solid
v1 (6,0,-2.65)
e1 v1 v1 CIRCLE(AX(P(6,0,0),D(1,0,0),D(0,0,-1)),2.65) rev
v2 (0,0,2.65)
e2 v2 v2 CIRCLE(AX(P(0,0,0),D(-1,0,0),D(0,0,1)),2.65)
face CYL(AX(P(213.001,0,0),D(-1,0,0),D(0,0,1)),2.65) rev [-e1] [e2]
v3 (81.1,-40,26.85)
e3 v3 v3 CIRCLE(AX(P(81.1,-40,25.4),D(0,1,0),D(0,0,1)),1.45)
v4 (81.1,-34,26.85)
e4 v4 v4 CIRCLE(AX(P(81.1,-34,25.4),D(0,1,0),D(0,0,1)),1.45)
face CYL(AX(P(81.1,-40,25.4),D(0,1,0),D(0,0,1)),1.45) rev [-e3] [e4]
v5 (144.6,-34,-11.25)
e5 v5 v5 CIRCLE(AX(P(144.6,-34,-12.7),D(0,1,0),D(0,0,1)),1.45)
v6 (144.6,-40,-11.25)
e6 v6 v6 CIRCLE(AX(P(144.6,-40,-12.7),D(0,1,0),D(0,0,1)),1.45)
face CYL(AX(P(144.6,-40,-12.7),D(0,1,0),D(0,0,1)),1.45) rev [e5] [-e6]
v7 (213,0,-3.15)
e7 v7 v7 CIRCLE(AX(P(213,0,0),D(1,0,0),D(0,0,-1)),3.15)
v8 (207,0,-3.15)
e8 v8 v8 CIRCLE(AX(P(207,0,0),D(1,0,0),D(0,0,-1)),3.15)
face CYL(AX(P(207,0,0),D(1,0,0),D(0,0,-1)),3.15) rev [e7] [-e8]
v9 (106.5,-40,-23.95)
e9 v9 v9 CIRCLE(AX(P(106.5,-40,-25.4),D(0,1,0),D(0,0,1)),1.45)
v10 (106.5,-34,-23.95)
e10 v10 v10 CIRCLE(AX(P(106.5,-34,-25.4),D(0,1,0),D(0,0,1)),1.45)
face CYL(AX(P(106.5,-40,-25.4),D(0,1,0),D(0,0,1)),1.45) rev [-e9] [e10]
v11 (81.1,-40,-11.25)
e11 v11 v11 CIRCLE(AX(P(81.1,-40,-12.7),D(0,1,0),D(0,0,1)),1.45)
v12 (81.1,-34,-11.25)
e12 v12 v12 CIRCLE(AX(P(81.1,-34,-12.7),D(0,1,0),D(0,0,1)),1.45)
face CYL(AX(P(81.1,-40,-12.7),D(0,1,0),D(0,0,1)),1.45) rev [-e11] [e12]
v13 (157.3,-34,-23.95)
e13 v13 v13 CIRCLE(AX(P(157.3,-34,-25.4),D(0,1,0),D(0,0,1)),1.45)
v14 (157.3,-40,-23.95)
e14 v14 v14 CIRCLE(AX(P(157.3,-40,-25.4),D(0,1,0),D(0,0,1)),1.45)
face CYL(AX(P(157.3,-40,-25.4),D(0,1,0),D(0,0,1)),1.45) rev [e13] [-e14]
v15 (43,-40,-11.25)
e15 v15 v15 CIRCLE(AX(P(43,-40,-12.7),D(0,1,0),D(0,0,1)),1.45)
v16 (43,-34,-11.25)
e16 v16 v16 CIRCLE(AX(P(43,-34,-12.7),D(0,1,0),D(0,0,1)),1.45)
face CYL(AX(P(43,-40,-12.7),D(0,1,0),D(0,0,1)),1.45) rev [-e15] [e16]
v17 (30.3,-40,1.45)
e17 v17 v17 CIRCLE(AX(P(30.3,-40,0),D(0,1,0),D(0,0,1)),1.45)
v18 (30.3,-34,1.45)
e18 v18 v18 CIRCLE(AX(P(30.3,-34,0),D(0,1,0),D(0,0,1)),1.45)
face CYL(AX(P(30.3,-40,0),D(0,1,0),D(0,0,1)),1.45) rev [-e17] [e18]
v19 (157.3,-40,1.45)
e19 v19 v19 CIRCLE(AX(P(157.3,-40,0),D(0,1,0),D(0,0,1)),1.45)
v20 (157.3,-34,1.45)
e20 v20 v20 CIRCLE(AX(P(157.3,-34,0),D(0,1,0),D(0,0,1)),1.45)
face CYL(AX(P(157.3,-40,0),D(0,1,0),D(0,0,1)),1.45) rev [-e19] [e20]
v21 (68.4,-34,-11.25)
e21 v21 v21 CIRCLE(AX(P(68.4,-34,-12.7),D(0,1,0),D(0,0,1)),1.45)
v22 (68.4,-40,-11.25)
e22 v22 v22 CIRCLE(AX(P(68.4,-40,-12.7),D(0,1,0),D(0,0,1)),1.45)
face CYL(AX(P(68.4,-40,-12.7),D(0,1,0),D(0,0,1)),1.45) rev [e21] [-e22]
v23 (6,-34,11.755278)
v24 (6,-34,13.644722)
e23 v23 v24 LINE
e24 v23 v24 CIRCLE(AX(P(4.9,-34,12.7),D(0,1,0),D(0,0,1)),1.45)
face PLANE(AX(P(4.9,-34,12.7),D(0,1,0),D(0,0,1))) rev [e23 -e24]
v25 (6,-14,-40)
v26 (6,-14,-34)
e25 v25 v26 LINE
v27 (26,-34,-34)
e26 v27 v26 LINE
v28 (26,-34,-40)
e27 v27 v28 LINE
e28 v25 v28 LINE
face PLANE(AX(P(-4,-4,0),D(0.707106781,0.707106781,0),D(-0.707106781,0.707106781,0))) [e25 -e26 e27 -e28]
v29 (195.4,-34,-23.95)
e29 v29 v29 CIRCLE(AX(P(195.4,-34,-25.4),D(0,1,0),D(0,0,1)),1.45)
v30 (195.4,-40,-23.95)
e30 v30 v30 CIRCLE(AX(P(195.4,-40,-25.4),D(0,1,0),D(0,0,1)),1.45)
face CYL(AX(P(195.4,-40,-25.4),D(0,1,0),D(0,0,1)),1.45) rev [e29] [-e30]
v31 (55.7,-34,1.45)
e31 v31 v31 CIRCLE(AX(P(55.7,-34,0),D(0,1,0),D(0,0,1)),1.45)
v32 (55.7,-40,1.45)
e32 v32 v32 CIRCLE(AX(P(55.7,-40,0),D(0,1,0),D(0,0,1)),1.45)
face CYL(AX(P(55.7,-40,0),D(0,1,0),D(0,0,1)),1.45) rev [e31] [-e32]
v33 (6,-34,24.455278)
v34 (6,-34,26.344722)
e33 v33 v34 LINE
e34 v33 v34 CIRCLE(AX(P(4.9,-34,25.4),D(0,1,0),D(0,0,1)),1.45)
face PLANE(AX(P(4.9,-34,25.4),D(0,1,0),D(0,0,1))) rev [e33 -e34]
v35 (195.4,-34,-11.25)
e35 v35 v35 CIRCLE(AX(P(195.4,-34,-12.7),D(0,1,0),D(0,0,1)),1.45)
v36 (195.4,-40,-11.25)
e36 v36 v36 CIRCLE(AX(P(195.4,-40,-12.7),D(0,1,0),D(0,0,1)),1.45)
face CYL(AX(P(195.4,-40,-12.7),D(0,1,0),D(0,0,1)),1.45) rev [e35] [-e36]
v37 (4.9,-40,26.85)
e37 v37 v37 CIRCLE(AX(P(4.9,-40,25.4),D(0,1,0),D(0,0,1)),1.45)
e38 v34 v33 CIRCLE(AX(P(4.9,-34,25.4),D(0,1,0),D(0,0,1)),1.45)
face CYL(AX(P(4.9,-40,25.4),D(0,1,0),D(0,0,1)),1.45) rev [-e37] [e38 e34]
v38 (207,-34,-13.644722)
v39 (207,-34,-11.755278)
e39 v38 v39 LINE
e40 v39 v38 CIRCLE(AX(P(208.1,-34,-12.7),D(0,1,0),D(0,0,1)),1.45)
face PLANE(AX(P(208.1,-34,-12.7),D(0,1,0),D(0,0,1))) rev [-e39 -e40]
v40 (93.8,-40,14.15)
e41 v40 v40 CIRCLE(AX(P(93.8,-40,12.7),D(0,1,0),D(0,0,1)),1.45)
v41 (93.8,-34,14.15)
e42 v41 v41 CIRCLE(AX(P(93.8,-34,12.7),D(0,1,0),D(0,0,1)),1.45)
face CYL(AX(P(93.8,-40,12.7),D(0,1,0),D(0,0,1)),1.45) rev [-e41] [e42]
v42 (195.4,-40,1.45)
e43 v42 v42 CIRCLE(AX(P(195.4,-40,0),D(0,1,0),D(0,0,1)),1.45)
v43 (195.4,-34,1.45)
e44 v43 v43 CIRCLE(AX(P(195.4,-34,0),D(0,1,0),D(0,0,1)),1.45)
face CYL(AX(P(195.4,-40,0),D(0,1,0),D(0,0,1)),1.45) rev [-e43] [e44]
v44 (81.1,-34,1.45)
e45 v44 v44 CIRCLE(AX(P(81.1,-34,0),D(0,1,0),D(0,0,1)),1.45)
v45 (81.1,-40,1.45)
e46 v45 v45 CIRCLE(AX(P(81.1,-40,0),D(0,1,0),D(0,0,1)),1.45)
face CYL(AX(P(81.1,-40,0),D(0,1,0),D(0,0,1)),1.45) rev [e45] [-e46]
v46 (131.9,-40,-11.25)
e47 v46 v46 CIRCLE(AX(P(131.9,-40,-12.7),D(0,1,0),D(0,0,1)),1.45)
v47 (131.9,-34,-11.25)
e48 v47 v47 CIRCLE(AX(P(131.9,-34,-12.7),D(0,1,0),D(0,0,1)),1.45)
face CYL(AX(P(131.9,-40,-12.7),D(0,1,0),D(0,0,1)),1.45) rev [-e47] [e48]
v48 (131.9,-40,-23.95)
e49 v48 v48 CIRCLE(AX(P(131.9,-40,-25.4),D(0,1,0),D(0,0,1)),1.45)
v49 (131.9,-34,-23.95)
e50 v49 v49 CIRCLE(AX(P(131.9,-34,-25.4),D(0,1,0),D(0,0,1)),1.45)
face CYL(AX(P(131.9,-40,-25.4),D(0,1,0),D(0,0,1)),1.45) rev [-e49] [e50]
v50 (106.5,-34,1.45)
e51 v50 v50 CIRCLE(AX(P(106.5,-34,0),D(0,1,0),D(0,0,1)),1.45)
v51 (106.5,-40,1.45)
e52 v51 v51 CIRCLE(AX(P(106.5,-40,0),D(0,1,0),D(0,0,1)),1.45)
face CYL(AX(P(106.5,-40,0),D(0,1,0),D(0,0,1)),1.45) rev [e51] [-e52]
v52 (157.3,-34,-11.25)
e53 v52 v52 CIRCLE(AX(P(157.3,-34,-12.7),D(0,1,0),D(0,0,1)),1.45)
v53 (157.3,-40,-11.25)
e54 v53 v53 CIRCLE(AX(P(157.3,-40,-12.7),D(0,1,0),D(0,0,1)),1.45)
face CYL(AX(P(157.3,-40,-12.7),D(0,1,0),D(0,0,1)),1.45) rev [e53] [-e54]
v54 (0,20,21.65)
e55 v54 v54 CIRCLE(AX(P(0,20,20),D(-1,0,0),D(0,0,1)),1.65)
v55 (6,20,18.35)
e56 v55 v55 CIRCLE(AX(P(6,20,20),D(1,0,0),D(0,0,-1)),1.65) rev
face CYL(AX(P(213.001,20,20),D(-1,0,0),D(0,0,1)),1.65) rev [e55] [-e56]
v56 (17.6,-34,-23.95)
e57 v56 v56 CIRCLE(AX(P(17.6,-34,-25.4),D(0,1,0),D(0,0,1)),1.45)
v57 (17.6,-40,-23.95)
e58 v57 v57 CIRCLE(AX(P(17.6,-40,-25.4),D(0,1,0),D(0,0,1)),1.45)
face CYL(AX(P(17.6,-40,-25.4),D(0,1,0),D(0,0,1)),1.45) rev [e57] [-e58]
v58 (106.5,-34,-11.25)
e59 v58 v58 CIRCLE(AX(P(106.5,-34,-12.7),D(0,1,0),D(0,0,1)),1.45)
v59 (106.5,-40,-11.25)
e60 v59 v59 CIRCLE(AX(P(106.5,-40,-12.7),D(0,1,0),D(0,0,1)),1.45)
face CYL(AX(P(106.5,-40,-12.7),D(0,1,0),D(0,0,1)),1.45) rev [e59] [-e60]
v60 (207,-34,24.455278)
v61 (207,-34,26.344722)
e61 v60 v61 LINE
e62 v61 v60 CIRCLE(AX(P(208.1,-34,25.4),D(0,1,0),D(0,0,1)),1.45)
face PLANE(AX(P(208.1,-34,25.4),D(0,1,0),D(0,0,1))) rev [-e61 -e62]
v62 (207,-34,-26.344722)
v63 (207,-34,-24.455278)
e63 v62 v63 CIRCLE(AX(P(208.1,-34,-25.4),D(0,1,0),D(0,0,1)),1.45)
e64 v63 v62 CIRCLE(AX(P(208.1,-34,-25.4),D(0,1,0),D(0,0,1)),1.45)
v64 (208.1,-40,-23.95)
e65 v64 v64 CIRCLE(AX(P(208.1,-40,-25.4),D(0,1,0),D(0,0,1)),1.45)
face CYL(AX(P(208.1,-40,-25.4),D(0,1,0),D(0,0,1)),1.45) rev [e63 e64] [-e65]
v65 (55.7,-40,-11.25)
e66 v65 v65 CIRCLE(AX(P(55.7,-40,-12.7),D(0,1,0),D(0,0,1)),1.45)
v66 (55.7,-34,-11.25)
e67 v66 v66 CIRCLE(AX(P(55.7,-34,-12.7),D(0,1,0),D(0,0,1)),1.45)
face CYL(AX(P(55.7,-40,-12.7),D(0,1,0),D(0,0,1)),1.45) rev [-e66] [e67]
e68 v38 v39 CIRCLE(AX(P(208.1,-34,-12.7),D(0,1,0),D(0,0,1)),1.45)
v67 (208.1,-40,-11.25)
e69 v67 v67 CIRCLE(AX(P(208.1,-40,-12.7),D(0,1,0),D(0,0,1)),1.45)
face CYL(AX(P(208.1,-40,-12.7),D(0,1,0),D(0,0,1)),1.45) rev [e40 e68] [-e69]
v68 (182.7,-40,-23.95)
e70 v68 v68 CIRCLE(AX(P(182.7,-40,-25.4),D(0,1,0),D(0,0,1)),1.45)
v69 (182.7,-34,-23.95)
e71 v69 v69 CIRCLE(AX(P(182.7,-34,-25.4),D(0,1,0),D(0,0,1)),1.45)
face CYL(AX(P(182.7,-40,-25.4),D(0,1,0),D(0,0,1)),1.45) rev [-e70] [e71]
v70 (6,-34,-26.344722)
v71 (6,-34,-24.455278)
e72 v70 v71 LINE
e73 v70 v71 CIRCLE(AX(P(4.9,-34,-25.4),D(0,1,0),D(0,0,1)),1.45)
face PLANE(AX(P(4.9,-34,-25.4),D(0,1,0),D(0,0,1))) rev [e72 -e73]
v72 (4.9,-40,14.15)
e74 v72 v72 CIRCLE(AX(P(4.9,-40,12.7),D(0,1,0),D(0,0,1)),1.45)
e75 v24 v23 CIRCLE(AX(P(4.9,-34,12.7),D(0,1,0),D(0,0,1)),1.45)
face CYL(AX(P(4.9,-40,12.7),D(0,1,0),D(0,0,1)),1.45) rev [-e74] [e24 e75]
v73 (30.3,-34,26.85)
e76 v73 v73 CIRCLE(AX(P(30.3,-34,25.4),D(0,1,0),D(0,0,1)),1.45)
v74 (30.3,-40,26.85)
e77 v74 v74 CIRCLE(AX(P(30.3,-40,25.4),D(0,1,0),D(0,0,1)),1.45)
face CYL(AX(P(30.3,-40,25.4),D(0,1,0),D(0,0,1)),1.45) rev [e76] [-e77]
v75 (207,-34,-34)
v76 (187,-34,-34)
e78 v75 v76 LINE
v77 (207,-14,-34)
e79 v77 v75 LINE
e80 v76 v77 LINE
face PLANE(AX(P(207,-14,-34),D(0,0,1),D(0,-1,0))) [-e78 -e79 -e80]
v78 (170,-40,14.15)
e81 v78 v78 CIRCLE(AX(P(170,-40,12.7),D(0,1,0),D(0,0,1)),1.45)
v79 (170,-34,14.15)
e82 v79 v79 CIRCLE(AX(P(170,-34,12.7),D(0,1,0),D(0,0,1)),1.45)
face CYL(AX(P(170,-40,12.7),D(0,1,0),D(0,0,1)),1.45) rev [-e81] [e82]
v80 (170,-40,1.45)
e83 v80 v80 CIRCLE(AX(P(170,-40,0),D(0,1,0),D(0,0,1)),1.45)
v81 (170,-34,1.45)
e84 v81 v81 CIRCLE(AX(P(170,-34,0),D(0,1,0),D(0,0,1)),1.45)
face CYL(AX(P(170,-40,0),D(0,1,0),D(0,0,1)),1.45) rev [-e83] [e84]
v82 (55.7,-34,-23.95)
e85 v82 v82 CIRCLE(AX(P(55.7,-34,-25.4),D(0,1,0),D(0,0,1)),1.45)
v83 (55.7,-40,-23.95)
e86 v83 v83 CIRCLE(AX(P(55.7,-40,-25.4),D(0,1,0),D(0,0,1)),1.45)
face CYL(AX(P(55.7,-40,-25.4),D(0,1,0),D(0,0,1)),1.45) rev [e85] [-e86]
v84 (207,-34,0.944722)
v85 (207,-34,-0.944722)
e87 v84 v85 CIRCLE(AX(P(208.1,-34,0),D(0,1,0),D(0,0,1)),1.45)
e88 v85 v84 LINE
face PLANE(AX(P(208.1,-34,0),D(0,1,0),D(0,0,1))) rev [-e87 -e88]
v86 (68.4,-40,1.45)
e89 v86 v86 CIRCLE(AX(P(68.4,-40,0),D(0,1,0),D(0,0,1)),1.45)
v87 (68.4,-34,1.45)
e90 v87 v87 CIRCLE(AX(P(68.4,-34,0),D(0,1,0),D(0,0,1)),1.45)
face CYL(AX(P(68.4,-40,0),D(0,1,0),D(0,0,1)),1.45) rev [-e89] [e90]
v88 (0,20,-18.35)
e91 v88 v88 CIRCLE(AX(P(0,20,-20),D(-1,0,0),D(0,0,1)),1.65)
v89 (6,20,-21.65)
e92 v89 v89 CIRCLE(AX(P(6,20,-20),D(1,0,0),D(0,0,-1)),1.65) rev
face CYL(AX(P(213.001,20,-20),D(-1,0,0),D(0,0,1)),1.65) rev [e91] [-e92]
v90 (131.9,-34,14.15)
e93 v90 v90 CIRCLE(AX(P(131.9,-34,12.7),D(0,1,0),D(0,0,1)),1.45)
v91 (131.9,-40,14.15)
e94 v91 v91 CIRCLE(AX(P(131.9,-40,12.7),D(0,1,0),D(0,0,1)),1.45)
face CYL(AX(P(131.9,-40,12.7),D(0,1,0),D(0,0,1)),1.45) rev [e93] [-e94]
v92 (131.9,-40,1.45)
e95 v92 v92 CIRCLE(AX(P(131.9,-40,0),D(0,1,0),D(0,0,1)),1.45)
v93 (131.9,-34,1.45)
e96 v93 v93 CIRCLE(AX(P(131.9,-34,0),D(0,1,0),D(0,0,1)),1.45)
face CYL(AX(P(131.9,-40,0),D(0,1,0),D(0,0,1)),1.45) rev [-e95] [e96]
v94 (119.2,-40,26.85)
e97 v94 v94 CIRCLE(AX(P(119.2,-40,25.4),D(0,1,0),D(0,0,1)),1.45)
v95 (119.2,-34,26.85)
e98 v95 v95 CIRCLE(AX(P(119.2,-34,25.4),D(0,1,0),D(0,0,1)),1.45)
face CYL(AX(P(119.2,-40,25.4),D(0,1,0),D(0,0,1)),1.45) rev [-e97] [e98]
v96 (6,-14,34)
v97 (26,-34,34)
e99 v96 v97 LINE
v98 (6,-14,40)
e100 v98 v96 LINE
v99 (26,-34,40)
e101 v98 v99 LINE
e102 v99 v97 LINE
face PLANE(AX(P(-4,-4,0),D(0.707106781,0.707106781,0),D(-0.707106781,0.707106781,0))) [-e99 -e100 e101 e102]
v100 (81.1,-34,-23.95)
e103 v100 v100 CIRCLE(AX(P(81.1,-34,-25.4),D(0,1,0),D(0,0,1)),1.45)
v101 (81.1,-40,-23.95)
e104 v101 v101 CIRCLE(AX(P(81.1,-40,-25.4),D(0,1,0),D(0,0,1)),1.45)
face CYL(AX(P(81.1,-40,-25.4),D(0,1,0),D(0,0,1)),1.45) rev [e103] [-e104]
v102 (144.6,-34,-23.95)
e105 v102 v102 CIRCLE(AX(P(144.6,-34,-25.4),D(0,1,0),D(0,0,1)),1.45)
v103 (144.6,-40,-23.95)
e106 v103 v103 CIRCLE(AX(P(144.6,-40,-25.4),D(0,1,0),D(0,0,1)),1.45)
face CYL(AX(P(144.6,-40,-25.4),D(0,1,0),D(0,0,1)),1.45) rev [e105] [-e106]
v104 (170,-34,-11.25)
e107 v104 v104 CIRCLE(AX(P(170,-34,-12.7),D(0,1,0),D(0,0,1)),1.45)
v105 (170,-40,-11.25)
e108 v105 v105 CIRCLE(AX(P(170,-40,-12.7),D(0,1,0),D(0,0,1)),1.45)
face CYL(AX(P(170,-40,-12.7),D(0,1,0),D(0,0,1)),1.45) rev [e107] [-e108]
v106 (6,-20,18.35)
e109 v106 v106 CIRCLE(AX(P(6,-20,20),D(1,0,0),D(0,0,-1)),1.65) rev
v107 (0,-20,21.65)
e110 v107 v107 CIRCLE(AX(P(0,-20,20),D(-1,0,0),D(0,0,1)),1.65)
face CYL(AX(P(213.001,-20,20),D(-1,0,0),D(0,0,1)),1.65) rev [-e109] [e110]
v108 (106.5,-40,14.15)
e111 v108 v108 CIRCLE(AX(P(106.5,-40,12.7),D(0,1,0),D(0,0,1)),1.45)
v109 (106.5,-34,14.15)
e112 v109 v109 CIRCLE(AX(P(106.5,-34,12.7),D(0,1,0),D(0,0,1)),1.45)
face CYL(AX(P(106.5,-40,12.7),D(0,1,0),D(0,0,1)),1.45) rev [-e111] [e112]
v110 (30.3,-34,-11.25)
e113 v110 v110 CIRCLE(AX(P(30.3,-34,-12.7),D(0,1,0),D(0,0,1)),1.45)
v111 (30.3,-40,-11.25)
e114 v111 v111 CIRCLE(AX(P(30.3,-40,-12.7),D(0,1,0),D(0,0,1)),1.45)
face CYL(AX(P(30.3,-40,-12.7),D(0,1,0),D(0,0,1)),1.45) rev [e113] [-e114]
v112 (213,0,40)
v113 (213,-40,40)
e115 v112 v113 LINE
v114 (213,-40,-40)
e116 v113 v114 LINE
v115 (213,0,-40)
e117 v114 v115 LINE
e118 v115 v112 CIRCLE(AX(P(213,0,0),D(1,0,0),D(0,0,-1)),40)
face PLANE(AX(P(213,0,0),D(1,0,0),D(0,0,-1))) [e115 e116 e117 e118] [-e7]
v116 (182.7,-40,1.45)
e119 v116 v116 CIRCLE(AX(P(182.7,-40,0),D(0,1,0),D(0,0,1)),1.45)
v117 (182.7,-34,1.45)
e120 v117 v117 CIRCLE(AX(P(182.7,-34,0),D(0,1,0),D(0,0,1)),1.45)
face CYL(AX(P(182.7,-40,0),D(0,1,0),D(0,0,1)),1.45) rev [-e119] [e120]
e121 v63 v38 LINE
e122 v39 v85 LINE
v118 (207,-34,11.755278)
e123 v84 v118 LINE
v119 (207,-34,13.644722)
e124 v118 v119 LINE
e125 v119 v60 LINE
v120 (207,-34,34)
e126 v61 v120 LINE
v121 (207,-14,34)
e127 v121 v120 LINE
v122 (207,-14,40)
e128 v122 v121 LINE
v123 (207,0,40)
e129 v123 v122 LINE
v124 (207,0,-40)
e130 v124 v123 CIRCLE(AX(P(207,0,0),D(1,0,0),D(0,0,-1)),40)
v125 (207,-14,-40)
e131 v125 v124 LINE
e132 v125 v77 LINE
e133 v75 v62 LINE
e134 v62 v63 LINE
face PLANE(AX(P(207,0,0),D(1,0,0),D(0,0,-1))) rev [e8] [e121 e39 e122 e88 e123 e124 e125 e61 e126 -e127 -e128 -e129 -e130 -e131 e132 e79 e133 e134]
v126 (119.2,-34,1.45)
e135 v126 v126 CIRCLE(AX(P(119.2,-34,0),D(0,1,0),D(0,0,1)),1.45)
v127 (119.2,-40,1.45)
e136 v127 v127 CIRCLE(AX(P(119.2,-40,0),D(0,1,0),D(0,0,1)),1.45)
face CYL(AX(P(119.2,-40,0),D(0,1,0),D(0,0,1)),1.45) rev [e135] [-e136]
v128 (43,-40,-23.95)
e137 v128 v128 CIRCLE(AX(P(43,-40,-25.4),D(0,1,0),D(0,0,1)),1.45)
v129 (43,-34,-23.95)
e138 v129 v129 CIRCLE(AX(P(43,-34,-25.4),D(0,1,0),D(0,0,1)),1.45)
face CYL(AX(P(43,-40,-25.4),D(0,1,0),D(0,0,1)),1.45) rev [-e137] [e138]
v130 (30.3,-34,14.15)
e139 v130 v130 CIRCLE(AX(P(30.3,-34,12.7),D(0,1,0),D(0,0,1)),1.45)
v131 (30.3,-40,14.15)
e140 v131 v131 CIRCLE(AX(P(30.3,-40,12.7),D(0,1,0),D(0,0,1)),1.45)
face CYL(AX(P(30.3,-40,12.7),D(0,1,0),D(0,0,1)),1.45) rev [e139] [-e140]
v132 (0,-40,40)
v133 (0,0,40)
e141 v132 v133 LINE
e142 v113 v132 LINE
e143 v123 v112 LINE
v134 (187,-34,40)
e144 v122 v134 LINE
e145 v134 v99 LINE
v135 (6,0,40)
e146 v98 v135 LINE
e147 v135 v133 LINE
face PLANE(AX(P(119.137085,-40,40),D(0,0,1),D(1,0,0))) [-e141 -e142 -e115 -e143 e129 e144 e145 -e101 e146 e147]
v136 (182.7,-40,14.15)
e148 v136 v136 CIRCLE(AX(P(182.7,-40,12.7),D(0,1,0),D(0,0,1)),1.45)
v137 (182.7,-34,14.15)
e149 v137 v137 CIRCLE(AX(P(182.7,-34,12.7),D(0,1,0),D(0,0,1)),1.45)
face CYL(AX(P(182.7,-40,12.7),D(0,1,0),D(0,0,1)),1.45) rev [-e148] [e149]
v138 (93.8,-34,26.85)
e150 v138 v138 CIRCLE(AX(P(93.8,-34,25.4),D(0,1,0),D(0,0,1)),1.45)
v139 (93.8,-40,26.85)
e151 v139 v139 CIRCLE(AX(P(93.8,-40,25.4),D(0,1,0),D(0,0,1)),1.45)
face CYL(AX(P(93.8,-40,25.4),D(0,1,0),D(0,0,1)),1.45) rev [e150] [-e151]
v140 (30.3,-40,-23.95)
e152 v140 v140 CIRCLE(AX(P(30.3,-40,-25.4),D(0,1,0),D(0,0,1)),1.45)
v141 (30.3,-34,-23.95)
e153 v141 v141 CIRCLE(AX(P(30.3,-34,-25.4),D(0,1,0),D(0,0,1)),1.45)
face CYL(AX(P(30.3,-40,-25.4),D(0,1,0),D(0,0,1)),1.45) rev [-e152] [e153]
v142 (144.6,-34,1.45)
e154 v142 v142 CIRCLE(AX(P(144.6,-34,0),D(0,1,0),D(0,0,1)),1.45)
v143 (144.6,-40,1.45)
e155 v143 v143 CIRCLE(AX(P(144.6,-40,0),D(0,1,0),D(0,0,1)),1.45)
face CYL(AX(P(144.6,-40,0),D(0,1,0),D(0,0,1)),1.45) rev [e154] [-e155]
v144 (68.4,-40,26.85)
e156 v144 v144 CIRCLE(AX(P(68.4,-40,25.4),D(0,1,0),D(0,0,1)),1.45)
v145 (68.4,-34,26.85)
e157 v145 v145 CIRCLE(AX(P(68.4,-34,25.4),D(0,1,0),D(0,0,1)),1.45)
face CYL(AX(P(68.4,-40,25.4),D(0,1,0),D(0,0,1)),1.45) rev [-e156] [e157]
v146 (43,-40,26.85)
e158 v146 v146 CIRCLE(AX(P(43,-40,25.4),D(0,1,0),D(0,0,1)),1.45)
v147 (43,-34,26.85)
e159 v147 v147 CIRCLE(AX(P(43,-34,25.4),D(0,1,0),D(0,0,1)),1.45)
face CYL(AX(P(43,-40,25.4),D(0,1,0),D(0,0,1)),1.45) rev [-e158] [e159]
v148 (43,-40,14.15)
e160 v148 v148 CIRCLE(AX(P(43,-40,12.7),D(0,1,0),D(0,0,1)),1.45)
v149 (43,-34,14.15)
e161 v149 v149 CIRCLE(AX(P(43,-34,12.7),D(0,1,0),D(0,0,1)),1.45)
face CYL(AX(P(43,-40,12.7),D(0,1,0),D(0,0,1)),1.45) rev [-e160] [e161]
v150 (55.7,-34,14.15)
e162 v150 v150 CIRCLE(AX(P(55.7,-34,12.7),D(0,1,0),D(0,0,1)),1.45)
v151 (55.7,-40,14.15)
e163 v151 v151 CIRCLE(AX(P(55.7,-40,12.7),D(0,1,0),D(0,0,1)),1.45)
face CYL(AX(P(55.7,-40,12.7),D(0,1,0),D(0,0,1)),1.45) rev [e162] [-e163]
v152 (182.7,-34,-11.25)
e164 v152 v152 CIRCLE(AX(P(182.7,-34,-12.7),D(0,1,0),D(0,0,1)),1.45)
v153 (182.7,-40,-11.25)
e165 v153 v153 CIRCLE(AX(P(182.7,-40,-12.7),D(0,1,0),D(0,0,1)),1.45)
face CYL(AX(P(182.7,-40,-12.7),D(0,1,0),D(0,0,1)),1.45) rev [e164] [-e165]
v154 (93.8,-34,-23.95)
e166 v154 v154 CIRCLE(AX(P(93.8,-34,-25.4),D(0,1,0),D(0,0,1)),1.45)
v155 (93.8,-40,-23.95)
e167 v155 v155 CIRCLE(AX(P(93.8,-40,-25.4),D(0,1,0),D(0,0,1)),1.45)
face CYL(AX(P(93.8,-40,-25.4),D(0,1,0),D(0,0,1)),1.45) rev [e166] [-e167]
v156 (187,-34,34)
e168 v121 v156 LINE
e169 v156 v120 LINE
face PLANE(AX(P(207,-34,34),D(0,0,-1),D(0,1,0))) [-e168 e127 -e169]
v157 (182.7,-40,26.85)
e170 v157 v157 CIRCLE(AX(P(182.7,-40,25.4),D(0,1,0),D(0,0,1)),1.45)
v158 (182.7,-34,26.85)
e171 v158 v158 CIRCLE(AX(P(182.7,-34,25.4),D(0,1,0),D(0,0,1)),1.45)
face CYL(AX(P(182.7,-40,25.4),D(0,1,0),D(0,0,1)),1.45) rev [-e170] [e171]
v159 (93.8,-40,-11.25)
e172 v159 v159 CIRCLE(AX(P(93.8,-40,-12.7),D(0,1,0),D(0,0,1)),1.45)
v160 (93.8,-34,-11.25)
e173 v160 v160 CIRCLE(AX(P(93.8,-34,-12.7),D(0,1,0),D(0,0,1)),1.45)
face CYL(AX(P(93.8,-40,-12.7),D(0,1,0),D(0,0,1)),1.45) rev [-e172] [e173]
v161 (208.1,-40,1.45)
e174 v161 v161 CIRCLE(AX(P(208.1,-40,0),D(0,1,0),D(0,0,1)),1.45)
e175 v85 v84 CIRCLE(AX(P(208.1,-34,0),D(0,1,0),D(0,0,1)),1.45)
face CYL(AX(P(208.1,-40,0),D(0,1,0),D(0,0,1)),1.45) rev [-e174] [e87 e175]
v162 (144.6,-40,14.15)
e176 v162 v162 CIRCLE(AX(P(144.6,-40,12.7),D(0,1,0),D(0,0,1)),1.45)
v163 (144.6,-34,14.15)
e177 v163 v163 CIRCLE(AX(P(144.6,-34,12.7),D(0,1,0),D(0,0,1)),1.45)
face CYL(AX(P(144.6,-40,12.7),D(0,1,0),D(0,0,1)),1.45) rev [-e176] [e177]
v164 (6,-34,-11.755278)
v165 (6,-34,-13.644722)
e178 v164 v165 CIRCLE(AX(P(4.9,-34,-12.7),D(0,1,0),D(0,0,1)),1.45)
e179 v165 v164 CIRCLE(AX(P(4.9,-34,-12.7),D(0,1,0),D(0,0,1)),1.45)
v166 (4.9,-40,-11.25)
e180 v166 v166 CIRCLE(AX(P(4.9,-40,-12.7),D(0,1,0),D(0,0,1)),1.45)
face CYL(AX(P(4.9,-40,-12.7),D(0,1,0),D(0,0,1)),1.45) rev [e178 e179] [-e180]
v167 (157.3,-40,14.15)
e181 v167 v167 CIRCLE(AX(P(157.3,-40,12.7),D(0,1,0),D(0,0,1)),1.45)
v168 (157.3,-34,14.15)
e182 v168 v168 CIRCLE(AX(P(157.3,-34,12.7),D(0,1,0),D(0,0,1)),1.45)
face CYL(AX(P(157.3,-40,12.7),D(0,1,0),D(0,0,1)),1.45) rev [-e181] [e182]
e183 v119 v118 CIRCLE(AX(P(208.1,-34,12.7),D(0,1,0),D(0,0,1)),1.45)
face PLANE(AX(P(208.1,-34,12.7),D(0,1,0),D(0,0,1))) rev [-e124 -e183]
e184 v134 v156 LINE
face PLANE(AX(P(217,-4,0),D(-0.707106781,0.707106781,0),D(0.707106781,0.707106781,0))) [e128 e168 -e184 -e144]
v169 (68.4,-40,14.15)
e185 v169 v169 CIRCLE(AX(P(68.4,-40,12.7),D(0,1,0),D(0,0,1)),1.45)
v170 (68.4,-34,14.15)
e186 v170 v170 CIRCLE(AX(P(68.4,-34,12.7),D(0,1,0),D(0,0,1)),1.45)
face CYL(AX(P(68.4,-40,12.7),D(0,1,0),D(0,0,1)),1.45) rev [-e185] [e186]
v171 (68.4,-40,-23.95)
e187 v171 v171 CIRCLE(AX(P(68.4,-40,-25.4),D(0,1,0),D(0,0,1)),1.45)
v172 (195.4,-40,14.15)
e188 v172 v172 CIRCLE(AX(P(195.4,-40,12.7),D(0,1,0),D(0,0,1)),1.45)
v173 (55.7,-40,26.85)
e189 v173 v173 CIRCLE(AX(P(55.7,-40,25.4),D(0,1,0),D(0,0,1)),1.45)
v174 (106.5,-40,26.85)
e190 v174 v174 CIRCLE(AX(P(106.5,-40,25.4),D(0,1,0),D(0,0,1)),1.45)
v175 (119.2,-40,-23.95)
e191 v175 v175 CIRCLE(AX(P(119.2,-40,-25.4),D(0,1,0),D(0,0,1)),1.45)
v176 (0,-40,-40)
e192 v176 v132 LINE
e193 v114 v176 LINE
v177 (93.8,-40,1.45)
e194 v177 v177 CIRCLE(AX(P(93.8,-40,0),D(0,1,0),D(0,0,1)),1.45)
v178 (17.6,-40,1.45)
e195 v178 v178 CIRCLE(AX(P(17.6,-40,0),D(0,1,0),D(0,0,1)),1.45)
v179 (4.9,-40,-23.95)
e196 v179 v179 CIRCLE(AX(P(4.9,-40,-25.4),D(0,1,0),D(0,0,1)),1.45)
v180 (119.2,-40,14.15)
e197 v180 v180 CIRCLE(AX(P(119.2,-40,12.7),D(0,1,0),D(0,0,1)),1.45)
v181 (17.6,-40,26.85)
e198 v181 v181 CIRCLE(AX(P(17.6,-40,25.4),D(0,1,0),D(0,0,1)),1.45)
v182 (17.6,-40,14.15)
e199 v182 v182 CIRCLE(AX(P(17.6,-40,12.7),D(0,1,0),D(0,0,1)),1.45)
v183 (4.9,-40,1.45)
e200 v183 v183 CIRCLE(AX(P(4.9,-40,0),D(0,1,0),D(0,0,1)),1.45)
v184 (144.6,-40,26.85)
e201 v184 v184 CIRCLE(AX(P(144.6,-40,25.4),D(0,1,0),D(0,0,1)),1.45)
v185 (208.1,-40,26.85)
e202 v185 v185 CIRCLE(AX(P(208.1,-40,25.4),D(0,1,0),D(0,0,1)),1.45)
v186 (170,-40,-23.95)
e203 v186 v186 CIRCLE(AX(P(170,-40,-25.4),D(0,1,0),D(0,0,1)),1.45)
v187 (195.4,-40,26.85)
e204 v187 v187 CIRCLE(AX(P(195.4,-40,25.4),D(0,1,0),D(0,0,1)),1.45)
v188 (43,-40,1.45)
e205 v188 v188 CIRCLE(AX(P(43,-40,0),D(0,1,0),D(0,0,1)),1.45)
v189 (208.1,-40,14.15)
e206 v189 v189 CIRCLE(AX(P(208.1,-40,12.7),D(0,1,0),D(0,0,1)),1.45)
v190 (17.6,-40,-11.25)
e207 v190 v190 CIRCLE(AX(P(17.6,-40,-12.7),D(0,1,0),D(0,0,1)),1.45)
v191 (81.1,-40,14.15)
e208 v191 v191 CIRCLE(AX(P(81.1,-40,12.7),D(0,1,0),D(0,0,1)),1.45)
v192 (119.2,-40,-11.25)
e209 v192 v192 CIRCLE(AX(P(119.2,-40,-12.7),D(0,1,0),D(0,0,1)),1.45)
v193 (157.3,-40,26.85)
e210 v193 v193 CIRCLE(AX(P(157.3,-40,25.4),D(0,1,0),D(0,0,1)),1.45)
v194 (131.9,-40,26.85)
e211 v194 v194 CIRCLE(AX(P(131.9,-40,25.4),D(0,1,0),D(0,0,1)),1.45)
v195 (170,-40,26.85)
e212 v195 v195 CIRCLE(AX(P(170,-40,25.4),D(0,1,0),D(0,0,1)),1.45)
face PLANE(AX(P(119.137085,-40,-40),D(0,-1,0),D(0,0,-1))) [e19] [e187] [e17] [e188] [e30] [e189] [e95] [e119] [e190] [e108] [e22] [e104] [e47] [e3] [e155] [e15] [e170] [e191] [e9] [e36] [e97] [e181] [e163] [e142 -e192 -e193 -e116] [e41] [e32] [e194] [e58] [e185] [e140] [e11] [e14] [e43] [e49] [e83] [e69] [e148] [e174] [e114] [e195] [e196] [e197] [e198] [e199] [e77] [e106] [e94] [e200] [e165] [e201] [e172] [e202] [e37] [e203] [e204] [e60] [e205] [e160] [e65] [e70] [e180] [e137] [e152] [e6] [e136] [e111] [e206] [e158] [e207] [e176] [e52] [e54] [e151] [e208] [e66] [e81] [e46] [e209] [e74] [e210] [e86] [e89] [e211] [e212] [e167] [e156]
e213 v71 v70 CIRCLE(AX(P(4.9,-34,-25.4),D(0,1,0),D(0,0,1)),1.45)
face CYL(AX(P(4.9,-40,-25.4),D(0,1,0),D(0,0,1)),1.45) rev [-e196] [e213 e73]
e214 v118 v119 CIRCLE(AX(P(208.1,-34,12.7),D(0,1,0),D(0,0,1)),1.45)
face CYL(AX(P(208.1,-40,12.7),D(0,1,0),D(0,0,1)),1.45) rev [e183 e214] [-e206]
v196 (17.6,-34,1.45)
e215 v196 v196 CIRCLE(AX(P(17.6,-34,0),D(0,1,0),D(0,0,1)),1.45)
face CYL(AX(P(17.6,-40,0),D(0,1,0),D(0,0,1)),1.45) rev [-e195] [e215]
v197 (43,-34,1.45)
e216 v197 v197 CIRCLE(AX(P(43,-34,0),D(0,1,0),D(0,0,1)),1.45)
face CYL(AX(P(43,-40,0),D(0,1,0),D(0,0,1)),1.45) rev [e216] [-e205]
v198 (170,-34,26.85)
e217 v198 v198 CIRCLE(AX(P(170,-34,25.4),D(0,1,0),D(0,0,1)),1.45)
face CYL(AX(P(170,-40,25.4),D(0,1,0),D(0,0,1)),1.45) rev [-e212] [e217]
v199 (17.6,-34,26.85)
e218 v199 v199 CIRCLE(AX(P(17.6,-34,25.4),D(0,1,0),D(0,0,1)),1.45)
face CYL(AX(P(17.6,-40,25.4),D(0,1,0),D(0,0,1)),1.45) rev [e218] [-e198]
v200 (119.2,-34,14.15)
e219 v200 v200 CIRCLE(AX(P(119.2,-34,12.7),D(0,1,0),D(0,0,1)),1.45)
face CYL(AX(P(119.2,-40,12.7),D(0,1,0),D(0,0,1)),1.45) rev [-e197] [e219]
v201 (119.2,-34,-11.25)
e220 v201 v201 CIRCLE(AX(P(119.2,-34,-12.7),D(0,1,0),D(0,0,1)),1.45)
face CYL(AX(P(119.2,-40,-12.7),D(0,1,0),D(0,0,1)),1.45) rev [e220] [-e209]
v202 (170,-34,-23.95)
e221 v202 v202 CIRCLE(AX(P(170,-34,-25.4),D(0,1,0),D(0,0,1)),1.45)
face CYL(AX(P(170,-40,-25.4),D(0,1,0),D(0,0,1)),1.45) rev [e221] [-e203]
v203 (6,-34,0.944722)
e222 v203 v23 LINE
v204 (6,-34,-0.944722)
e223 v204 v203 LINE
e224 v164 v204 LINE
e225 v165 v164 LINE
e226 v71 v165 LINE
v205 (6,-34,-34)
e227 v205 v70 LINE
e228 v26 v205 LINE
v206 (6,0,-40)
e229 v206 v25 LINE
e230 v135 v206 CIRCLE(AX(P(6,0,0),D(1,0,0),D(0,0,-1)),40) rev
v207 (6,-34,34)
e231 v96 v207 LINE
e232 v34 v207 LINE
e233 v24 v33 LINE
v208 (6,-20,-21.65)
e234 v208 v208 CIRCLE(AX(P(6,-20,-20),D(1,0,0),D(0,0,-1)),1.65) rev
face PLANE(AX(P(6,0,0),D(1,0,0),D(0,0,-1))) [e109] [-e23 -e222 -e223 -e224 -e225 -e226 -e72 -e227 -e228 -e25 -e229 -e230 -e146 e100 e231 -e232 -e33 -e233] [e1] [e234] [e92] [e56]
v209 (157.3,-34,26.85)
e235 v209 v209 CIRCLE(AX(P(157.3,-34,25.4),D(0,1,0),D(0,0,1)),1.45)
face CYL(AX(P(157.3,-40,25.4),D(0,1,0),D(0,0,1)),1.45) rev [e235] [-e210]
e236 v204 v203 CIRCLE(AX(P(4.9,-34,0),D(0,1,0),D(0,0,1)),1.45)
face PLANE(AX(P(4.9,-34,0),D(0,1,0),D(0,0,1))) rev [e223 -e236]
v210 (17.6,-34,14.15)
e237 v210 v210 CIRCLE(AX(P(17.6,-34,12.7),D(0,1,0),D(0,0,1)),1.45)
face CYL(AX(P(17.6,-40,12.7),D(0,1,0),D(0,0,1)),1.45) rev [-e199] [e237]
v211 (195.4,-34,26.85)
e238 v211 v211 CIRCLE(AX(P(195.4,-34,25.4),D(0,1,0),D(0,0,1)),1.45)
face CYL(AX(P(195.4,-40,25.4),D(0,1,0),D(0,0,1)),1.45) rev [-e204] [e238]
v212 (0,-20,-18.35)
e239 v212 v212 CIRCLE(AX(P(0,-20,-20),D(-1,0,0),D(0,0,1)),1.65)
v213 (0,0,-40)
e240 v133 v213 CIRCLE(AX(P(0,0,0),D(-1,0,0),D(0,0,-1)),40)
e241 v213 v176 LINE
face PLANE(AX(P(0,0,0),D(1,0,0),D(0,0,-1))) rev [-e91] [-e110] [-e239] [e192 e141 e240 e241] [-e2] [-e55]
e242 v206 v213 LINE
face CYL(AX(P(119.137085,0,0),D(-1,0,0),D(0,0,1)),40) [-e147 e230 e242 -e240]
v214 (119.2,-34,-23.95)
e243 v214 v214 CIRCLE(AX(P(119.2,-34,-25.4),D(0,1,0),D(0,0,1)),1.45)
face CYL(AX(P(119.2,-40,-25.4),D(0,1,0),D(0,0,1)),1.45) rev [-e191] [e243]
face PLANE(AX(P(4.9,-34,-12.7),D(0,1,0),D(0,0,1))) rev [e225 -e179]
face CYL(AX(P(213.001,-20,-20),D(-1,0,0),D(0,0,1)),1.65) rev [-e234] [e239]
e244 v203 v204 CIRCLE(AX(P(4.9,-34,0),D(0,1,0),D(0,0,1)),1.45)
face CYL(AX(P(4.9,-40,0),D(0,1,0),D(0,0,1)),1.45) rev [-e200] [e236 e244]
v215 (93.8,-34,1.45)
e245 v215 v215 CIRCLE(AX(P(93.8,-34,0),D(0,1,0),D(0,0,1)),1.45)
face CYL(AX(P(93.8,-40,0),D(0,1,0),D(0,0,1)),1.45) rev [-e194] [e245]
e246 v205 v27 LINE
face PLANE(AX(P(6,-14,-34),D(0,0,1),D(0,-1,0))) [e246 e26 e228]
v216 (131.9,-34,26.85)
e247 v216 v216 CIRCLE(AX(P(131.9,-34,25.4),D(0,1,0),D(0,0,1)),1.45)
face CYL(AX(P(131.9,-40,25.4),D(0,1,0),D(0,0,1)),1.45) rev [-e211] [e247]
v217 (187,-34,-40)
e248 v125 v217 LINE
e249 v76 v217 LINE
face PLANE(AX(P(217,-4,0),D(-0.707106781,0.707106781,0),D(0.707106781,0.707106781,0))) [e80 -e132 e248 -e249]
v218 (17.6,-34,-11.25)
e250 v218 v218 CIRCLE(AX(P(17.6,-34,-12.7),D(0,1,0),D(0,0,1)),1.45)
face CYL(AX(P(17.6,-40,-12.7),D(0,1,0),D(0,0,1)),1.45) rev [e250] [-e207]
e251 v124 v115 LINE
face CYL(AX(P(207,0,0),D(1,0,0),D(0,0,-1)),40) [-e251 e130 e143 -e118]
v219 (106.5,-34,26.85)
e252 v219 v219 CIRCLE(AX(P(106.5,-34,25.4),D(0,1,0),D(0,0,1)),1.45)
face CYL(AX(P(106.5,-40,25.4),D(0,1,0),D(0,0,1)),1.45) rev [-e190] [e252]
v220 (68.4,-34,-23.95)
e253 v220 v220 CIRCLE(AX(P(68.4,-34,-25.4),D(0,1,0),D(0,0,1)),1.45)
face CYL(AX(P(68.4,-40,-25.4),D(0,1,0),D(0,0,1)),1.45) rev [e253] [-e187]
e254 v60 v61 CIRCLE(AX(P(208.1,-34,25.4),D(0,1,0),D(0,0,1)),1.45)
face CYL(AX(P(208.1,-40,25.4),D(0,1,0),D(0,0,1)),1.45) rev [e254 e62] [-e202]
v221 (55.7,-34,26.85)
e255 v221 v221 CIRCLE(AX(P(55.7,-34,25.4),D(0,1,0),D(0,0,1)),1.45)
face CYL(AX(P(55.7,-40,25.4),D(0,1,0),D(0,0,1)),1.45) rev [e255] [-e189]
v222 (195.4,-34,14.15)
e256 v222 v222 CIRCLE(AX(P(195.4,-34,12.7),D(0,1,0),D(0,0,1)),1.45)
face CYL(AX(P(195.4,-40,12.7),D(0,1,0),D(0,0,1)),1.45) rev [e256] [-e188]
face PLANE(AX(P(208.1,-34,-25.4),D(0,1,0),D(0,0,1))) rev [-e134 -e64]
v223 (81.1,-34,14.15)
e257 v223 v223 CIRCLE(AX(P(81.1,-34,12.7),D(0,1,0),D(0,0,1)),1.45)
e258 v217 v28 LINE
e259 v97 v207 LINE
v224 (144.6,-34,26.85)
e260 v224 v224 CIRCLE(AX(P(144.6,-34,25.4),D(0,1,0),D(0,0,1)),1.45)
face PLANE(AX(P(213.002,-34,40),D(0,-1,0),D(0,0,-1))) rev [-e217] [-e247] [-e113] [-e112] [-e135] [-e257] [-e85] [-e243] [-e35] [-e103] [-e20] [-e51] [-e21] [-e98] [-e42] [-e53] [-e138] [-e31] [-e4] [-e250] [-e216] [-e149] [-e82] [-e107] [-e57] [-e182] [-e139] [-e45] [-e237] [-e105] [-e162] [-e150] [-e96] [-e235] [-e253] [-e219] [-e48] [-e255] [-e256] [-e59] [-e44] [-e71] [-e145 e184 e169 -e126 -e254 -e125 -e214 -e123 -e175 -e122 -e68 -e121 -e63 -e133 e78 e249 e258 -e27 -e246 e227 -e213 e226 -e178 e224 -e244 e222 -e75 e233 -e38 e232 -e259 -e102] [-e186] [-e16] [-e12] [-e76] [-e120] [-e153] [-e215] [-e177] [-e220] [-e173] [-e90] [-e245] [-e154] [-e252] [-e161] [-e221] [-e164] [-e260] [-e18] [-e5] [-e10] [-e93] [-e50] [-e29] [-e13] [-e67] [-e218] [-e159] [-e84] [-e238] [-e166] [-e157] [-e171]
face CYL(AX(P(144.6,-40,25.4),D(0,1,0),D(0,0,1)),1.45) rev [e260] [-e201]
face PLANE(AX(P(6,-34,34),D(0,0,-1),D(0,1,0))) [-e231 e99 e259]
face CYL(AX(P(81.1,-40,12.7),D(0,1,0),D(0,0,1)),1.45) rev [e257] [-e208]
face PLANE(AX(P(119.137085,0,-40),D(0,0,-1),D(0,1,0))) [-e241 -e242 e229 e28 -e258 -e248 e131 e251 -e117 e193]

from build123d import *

# Parameters (mm, degrees)
SKETCH1_R           = 10
BOSS_EXTRUDE1_DEPTH = 6
SKETCH2_R           = 1.65
CUT_EXTRUDE1_DEPTH  = 16.362291496
SKETCH5_R           = 10
BOSS_EXTRUDE2_DEPTH = 6
SKETCH6_R           = 3.15
BOSS_EXTRUDE3_DEPTH = 6
BOSS_EXTRUDE4_REACH = 216.59
SKETCH7_W           = 80
SKETCH7_H           = 6
LOFT1_START         = 34
LOFT1_DEPTH         = 6
LOFT2_START         = -40
LOFT2_DEPTH         = 6
SKETCH10_R          = 1.45
CUT_EXTRUDE3_DEPTH  = 230.008733458
CUT_EXTRUDE4_REACH  = 222.384
SKETCH13_R          = 2.65
SKETCH13_R_2        = 1.65


# Read off the part's stored shape, not the designer's step: Loft1, Loft2
with BuildPart() as part:
    # Sketch1 → Boss-Extrude1 (new body)
    with BuildSketch(Plane(origin=(0, 0, 0), x_dir=(0, 0, -1), z_dir=(1, 0, 0))):
        Circle(SKETCH1_R)
    extrude(amount=BOSS_EXTRUDE1_DEPTH)

    # Sketch2 → Cut-Extrude1 (cut, through all)
    with BuildSketch(Plane(origin=(6, 0, 0), x_dir=(0, 0, -1), z_dir=(1, 0, 0))):
        Circle(SKETCH2_R)
    extrude(amount=-CUT_EXTRUDE1_DEPTH, mode=Mode.SUBTRACT)

    # Sketch5 → Boss-Extrude2 (add)
    with BuildSketch(Plane.ZY):
        with BuildLine():
            Line((-40, 0), (-40, -40))
            Line((-40, -40), (40, -40))
            Line((40, -40), (40, 0))
            ThreePointArc((40, 0), (0, 40), (-40, 0))
        make_face()
        Circle(SKETCH5_R, mode=Mode.SUBTRACT)
    extrude(amount=-BOSS_EXTRUDE2_DEPTH)


with BuildPart() as body_2:
    # Sketch6 → Boss-Extrude3 (new body)
    with BuildSketch(Plane(origin=(213, 0, 0), x_dir=(0, 0, -1), z_dir=(1, 0, 0))):
        with BuildLine():
            Line((-40, 0), (-40, -40))
            Line((-40, -40), (40, -40))
            Line((40, -40), (40, 0))
            ThreePointArc((40, 0), (0, 40), (-40, 0))
        make_face()
        Circle(SKETCH6_R, mode=Mode.SUBTRACT)
    extrude(amount=-BOSS_EXTRUDE3_DEPTH)

    # Sketch7 → Boss-Extrude4 (add, up to next)
    with BuildSketch(Plane(origin=(6, 0, 0), x_dir=(0, 0, -1), z_dir=(1, 0, 0)), mode=Mode.PRIVATE) as boss_extrude4_sk1:
        with Locations((0, -37)):
            Rectangle(SKETCH7_W, SKETCH7_H)
    boss_extrude4_tool1 = extrude(boss_extrude4_sk1.sketch, amount=BOSS_EXTRUDE4_REACH, mode=Mode.PRIVATE) - body_2.part

    add(part.part)  # Boss-Extrude4 merges part
    add(boss_extrude4_tool1.solids().sort_by_distance((6, -37, 0))[0])

    # Loft1 outline → Loft1 (add)
    with BuildSketch(Plane.XY.offset(LOFT1_START)):
        Polygon((6, -34), (26, -34), (6, -14), align=None)
    loft1 = extrude(amount=LOFT1_DEPTH)

    # Loft2 outline → Loft2 (add)
    with BuildSketch(Plane.XY.offset(LOFT2_START)):
        Polygon((6, -34), (26, -34), (6, -14), align=None)
    loft2 = extrude(amount=LOFT2_DEPTH)

    # Mirror1: Loft1, Loft2 across plane
    add(loft1.mirror(Plane(origin=(106.5, 0, 0), x_dir=(0, 0, 1), z_dir=(1, 0, 0))))
    add(loft2.mirror(Plane(origin=(106.5, 0, 0), x_dir=(0, 0, 1), z_dir=(1, 0, 0))))

    # Sketch10 → Cut-Extrude3 (cut, through all)
    with BuildSketch(Plane(origin=(0, -34, 0), x_dir=(1, 0, 0), z_dir=(0, 1, 0))):
        with Locations(Location((106.5, 0, 0), (0, 0, 270))):
            Circle(SKETCH10_R)
        with Locations(Location((93.8, 0, 0), (0, 0, 270))):
            Circle(SKETCH10_R)
        with Locations(Location((81.1, 0, 0), (0, 0, 270))):
            Circle(SKETCH10_R)
        with Locations(Location((68.4, 0, 0), (0, 0, 270))):
            Circle(SKETCH10_R)
        with Locations(Location((55.7, 0, 0), (0, 0, 270))):
            Circle(SKETCH10_R)
        with Locations(Location((43, 0, 0), (0, 0, 270))):
            Circle(SKETCH10_R)
        with Locations(Location((30.3, 0, 0), (0, 0, 270))):
            Circle(SKETCH10_R)
        with Locations(Location((17.6, 0, 0), (0, 0, 270))):
            Circle(SKETCH10_R)
        with Locations(Location((4.9, 0, 0), (0, 0, 270))):
            Circle(SKETCH10_R)
        with Locations(Location((119.2, 0, 0), (0, 0, 270))):
            Circle(SKETCH10_R)
        with Locations(Location((131.9, 0, 0), (0, 0, 270))):
            Circle(SKETCH10_R)
        with Locations(Location((144.6, 0, 0), (0, 0, 270))):
            Circle(SKETCH10_R)
        with Locations(Location((157.3, 0, 0), (0, 0, 270))):
            Circle(SKETCH10_R)
        with Locations(Location((170, 0, 0), (0, 0, 270))):
            Circle(SKETCH10_R)
        with Locations(Location((182.7, 0, 0), (0, 0, 270))):
            Circle(SKETCH10_R)
        with Locations(Location((195.4, 0, 0), (0, 0, 270))):
            Circle(SKETCH10_R)
        with Locations(Location((208.1, 0, 0), (0, 0, 270))):
            Circle(SKETCH10_R)
        with Locations(Location((106.5, 12.7, 0), (0, 0, 270))):
            Circle(SKETCH10_R)
        with Locations(Location((93.8, 12.7, 0), (0, 0, 270))):
            Circle(SKETCH10_R)
        with Locations(Location((81.1, 12.7, 0), (0, 0, 270))):
            Circle(SKETCH10_R)
        with Locations(Location((68.4, 12.7, 0), (0, 0, 270))):
            Circle(SKETCH10_R)
        with Locations(Location((55.7, 12.7, 0), (0, 0, 270))):
            Circle(SKETCH10_R)
        with Locations(Location((43, 12.7, 0), (0, 0, 270))):
            Circle(SKETCH10_R)
        with Locations(Location((30.3, 12.7, 0), (0, 0, 270))):
            Circle(SKETCH10_R)
        with Locations(Location((17.6, 12.7, 0), (0, 0, 270))):
            Circle(SKETCH10_R)
        with Locations(Location((4.9, 12.7, 0), (0, 0, 270))):
            Circle(SKETCH10_R)
        with Locations(Location((119.2, 12.7, 0), (0, 0, 270))):
            Circle(SKETCH10_R)
        with Locations(Location((131.9, 12.7, 0), (0, 0, 270))):
            Circle(SKETCH10_R)
        with Locations(Location((144.6, 12.7, 0), (0, 0, 270))):
            Circle(SKETCH10_R)
        with Locations(Location((157.3, 12.7, 0), (0, 0, 270))):
            Circle(SKETCH10_R)
        with Locations(Location((170, 12.7, 0), (0, 0, 270))):
            Circle(SKETCH10_R)
        with Locations(Location((182.7, 12.7, 0), (0, 0, 270))):
            Circle(SKETCH10_R)
        with Locations(Location((195.4, 12.7, 0), (0, 0, 270))):
            Circle(SKETCH10_R)
        with Locations(Location((208.1, 12.7, 0), (0, 0, 270))):
            Circle(SKETCH10_R)
        with Locations(Location((106.5, 25.4, 0), (0, 0, 270))):
            Circle(SKETCH10_R)
        with Locations(Location((93.8, 25.4, 0), (0, 0, 270))):
            Circle(SKETCH10_R)
        with Locations(Location((81.1, 25.4, 0), (0, 0, 270))):
            Circle(SKETCH10_R)
        with Locations(Location((68.4, 25.4, 0), (0, 0, 270))):
            Circle(SKETCH10_R)
        with Locations(Location((55.7, 25.4, 0), (0, 0, 270))):
            Circle(SKETCH10_R)
        with Locations(Location((43, 25.4, 0), (0, 0, 270))):
            Circle(SKETCH10_R)
        with Locations(Location((30.3, 25.4, 0), (0, 0, 270))):
            Circle(SKETCH10_R)
        with Locations(Location((17.6, 25.4, 0), (0, 0, 270))):
            Circle(SKETCH10_R)
        with Locations(Location((4.9, 25.4, 0), (0, 0, 270))):
            Circle(SKETCH10_R)
        with Locations(Location((119.2, 25.4, 0), (0, 0, 270))):
            Circle(SKETCH10_R)
        with Locations(Location((131.9, 25.4, 0), (0, 0, 270))):
            Circle(SKETCH10_R)
        with Locations(Location((144.6, 25.4, 0), (0, 0, 270))):
            Circle(SKETCH10_R)
        with Locations(Location((157.3, 25.4, 0), (0, 0, 270))):
            Circle(SKETCH10_R)
        with Locations(Location((170, 25.4, 0), (0, 0, 270))):
            Circle(SKETCH10_R)
        with Locations(Location((182.7, 25.4, 0), (0, 0, 270))):
            Circle(SKETCH10_R)
        with Locations(Location((195.4, 25.4, 0), (0, 0, 270))):
            Circle(SKETCH10_R)
        with Locations(Location((208.1, 25.4, 0), (0, 0, 270))):
            Circle(SKETCH10_R)
        with Locations(Location((106.5, -12.7, 0), (0, 0, 270))):
            Circle(SKETCH10_R)
        with Locations(Location((93.8, -12.7, 0), (0, 0, 270))):
            Circle(SKETCH10_R)
        with Locations(Location((81.1, -12.7, 0), (0, 0, 270))):
            Circle(SKETCH10_R)
        with Locations(Location((68.4, -12.7, 0), (0, 0, 270))):
            Circle(SKETCH10_R)
        with Locations(Location((55.7, -12.7, 0), (0, 0, 270))):
            Circle(SKETCH10_R)
        with Locations(Location((43, -12.7, 0), (0, 0, 270))):
            Circle(SKETCH10_R)
        with Locations(Location((30.3, -12.7, 0), (0, 0, 270))):
            Circle(SKETCH10_R)
        with Locations(Location((17.6, -12.7, 0), (0, 0, 270))):
            Circle(SKETCH10_R)
        with Locations(Location((4.9, -12.7, 0), (0, 0, 270))):
            Circle(SKETCH10_R)
        with Locations(Location((119.2, -12.7, 0), (0, 0, 270))):
            Circle(SKETCH10_R)
        with Locations(Location((131.9, -12.7, 0), (0, 0, 270))):
            Circle(SKETCH10_R)
        with Locations(Location((144.6, -12.7, 0), (0, 0, 270))):
            Circle(SKETCH10_R)
        with Locations(Location((157.3, -12.7, 0), (0, 0, 270))):
            Circle(SKETCH10_R)
        with Locations(Location((170, -12.7, 0), (0, 0, 270))):
            Circle(SKETCH10_R)
        with Locations(Location((182.7, -12.7, 0), (0, 0, 270))):
            Circle(SKETCH10_R)
        with Locations(Location((195.4, -12.7, 0), (0, 0, 270))):
            Circle(SKETCH10_R)
        with Locations(Location((208.1, -12.7, 0), (0, 0, 270))):
            Circle(SKETCH10_R)
        with Locations(Location((106.5, -25.4, 0), (0, 0, 270))):
            Circle(SKETCH10_R)
        with Locations(Location((93.8, -25.4, 0), (0, 0, 270))):
            Circle(SKETCH10_R)
        with Locations(Location((81.1, -25.4, 0), (0, 0, 270))):
            Circle(SKETCH10_R)
        with Locations(Location((68.4, -25.4, 0), (0, 0, 270))):
            Circle(SKETCH10_R)
        with Locations(Location((55.7, -25.4, 0), (0, 0, 270))):
            Circle(SKETCH10_R)
        with Locations(Location((43, -25.4, 0), (0, 0, 270))):
            Circle(SKETCH10_R)
        with Locations(Location((30.3, -25.4, 0), (0, 0, 270))):
            Circle(SKETCH10_R)
        with Locations(Location((17.6, -25.4, 0), (0, 0, 270))):
            Circle(SKETCH10_R)
        with Locations(Location((4.9, -25.4, 0), (0, 0, 270))):
            Circle(SKETCH10_R)
        with Locations(Location((119.2, -25.4, 0), (0, 0, 270))):
            Circle(SKETCH10_R)
        with Locations(Location((131.9, -25.4, 0), (0, 0, 270))):
            Circle(SKETCH10_R)
        with Locations(Location((144.6, -25.4, 0), (0, 0, 270))):
            Circle(SKETCH10_R)
        with Locations(Location((157.3, -25.4, 0), (0, 0, 270))):
            Circle(SKETCH10_R)
        with Locations(Location((170, -25.4, 0), (0, 0, 270))):
            Circle(SKETCH10_R)
        with Locations(Location((182.7, -25.4, 0), (0, 0, 270))):
            Circle(SKETCH10_R)
        with Locations(Location((195.4, -25.4, 0), (0, 0, 270))):
            Circle(SKETCH10_R)
        with Locations(Location((208.1, -25.4, 0), (0, 0, 270))):
            Circle(SKETCH10_R)
    extrude(amount=-CUT_EXTRUDE3_DEPTH, mode=Mode.SUBTRACT)

    # Sketch13 → Cut-Extrude4 (cut, up to next)
    with BuildSketch(Plane.ZY, mode=Mode.PRIVATE) as cut_extrude4_sk1:
        Circle(SKETCH13_R)
    cut_extrude4_tool1 = extrude(cut_extrude4_sk1.sketch, amount=-CUT_EXTRUDE4_REACH, mode=Mode.PRIVATE) & body_2.part
    # Sketch13 → Cut-Extrude4 (cut, up to next)
    with BuildSketch(Plane.ZY, mode=Mode.PRIVATE) as cut_extrude4_sk2:
        with Locations((-20, 20)):
            Circle(SKETCH13_R_2)
    cut_extrude4_tool2 = extrude(cut_extrude4_sk2.sketch, amount=-CUT_EXTRUDE4_REACH, mode=Mode.PRIVATE) & body_2.part
    # Sketch13 → Cut-Extrude4 (cut, up to next)
    with BuildSketch(Plane.ZY, mode=Mode.PRIVATE) as cut_extrude4_sk3:
        with Locations((-20, -20)):
            Circle(SKETCH13_R_2)
    cut_extrude4_tool3 = extrude(cut_extrude4_sk3.sketch, amount=-CUT_EXTRUDE4_REACH, mode=Mode.PRIVATE) & body_2.part
    # Sketch13 → Cut-Extrude4 (cut, up to next)
    with BuildSketch(Plane.ZY, mode=Mode.PRIVATE) as cut_extrude4_sk4:
        with Locations((20, -20)):
            Circle(SKETCH13_R_2)
    cut_extrude4_tool4 = extrude(cut_extrude4_sk4.sketch, amount=-CUT_EXTRUDE4_REACH, mode=Mode.PRIVATE) & body_2.part
    # Sketch13 → Cut-Extrude4 (cut, up to next)
    with BuildSketch(Plane.ZY, mode=Mode.PRIVATE) as cut_extrude4_sk5:
        with Locations((20, 20)):
            Circle(SKETCH13_R_2)
    cut_extrude4_tool5 = extrude(cut_extrude4_sk5.sketch, amount=-CUT_EXTRUDE4_REACH, mode=Mode.PRIVATE) & body_2.part
    add(cut_extrude4_tool1.solids().sort_by_distance((0, 0, 0))[0], mode=Mode.SUBTRACT)
    add(cut_extrude4_tool2.solids().sort_by_distance((0, 20, -20))[0], mode=Mode.SUBTRACT)
    add(cut_extrude4_tool3.solids().sort_by_distance((0, -20, -20))[0], mode=Mode.SUBTRACT)
    add(cut_extrude4_tool4.solids().sort_by_distance((0, -20, 20))[0], mode=Mode.SUBTRACT)
    add(cut_extrude4_tool5.solids().sort_by_distance((0, 20, 20))[0], mode=Mode.SUBTRACT)


solid = body_2.part
